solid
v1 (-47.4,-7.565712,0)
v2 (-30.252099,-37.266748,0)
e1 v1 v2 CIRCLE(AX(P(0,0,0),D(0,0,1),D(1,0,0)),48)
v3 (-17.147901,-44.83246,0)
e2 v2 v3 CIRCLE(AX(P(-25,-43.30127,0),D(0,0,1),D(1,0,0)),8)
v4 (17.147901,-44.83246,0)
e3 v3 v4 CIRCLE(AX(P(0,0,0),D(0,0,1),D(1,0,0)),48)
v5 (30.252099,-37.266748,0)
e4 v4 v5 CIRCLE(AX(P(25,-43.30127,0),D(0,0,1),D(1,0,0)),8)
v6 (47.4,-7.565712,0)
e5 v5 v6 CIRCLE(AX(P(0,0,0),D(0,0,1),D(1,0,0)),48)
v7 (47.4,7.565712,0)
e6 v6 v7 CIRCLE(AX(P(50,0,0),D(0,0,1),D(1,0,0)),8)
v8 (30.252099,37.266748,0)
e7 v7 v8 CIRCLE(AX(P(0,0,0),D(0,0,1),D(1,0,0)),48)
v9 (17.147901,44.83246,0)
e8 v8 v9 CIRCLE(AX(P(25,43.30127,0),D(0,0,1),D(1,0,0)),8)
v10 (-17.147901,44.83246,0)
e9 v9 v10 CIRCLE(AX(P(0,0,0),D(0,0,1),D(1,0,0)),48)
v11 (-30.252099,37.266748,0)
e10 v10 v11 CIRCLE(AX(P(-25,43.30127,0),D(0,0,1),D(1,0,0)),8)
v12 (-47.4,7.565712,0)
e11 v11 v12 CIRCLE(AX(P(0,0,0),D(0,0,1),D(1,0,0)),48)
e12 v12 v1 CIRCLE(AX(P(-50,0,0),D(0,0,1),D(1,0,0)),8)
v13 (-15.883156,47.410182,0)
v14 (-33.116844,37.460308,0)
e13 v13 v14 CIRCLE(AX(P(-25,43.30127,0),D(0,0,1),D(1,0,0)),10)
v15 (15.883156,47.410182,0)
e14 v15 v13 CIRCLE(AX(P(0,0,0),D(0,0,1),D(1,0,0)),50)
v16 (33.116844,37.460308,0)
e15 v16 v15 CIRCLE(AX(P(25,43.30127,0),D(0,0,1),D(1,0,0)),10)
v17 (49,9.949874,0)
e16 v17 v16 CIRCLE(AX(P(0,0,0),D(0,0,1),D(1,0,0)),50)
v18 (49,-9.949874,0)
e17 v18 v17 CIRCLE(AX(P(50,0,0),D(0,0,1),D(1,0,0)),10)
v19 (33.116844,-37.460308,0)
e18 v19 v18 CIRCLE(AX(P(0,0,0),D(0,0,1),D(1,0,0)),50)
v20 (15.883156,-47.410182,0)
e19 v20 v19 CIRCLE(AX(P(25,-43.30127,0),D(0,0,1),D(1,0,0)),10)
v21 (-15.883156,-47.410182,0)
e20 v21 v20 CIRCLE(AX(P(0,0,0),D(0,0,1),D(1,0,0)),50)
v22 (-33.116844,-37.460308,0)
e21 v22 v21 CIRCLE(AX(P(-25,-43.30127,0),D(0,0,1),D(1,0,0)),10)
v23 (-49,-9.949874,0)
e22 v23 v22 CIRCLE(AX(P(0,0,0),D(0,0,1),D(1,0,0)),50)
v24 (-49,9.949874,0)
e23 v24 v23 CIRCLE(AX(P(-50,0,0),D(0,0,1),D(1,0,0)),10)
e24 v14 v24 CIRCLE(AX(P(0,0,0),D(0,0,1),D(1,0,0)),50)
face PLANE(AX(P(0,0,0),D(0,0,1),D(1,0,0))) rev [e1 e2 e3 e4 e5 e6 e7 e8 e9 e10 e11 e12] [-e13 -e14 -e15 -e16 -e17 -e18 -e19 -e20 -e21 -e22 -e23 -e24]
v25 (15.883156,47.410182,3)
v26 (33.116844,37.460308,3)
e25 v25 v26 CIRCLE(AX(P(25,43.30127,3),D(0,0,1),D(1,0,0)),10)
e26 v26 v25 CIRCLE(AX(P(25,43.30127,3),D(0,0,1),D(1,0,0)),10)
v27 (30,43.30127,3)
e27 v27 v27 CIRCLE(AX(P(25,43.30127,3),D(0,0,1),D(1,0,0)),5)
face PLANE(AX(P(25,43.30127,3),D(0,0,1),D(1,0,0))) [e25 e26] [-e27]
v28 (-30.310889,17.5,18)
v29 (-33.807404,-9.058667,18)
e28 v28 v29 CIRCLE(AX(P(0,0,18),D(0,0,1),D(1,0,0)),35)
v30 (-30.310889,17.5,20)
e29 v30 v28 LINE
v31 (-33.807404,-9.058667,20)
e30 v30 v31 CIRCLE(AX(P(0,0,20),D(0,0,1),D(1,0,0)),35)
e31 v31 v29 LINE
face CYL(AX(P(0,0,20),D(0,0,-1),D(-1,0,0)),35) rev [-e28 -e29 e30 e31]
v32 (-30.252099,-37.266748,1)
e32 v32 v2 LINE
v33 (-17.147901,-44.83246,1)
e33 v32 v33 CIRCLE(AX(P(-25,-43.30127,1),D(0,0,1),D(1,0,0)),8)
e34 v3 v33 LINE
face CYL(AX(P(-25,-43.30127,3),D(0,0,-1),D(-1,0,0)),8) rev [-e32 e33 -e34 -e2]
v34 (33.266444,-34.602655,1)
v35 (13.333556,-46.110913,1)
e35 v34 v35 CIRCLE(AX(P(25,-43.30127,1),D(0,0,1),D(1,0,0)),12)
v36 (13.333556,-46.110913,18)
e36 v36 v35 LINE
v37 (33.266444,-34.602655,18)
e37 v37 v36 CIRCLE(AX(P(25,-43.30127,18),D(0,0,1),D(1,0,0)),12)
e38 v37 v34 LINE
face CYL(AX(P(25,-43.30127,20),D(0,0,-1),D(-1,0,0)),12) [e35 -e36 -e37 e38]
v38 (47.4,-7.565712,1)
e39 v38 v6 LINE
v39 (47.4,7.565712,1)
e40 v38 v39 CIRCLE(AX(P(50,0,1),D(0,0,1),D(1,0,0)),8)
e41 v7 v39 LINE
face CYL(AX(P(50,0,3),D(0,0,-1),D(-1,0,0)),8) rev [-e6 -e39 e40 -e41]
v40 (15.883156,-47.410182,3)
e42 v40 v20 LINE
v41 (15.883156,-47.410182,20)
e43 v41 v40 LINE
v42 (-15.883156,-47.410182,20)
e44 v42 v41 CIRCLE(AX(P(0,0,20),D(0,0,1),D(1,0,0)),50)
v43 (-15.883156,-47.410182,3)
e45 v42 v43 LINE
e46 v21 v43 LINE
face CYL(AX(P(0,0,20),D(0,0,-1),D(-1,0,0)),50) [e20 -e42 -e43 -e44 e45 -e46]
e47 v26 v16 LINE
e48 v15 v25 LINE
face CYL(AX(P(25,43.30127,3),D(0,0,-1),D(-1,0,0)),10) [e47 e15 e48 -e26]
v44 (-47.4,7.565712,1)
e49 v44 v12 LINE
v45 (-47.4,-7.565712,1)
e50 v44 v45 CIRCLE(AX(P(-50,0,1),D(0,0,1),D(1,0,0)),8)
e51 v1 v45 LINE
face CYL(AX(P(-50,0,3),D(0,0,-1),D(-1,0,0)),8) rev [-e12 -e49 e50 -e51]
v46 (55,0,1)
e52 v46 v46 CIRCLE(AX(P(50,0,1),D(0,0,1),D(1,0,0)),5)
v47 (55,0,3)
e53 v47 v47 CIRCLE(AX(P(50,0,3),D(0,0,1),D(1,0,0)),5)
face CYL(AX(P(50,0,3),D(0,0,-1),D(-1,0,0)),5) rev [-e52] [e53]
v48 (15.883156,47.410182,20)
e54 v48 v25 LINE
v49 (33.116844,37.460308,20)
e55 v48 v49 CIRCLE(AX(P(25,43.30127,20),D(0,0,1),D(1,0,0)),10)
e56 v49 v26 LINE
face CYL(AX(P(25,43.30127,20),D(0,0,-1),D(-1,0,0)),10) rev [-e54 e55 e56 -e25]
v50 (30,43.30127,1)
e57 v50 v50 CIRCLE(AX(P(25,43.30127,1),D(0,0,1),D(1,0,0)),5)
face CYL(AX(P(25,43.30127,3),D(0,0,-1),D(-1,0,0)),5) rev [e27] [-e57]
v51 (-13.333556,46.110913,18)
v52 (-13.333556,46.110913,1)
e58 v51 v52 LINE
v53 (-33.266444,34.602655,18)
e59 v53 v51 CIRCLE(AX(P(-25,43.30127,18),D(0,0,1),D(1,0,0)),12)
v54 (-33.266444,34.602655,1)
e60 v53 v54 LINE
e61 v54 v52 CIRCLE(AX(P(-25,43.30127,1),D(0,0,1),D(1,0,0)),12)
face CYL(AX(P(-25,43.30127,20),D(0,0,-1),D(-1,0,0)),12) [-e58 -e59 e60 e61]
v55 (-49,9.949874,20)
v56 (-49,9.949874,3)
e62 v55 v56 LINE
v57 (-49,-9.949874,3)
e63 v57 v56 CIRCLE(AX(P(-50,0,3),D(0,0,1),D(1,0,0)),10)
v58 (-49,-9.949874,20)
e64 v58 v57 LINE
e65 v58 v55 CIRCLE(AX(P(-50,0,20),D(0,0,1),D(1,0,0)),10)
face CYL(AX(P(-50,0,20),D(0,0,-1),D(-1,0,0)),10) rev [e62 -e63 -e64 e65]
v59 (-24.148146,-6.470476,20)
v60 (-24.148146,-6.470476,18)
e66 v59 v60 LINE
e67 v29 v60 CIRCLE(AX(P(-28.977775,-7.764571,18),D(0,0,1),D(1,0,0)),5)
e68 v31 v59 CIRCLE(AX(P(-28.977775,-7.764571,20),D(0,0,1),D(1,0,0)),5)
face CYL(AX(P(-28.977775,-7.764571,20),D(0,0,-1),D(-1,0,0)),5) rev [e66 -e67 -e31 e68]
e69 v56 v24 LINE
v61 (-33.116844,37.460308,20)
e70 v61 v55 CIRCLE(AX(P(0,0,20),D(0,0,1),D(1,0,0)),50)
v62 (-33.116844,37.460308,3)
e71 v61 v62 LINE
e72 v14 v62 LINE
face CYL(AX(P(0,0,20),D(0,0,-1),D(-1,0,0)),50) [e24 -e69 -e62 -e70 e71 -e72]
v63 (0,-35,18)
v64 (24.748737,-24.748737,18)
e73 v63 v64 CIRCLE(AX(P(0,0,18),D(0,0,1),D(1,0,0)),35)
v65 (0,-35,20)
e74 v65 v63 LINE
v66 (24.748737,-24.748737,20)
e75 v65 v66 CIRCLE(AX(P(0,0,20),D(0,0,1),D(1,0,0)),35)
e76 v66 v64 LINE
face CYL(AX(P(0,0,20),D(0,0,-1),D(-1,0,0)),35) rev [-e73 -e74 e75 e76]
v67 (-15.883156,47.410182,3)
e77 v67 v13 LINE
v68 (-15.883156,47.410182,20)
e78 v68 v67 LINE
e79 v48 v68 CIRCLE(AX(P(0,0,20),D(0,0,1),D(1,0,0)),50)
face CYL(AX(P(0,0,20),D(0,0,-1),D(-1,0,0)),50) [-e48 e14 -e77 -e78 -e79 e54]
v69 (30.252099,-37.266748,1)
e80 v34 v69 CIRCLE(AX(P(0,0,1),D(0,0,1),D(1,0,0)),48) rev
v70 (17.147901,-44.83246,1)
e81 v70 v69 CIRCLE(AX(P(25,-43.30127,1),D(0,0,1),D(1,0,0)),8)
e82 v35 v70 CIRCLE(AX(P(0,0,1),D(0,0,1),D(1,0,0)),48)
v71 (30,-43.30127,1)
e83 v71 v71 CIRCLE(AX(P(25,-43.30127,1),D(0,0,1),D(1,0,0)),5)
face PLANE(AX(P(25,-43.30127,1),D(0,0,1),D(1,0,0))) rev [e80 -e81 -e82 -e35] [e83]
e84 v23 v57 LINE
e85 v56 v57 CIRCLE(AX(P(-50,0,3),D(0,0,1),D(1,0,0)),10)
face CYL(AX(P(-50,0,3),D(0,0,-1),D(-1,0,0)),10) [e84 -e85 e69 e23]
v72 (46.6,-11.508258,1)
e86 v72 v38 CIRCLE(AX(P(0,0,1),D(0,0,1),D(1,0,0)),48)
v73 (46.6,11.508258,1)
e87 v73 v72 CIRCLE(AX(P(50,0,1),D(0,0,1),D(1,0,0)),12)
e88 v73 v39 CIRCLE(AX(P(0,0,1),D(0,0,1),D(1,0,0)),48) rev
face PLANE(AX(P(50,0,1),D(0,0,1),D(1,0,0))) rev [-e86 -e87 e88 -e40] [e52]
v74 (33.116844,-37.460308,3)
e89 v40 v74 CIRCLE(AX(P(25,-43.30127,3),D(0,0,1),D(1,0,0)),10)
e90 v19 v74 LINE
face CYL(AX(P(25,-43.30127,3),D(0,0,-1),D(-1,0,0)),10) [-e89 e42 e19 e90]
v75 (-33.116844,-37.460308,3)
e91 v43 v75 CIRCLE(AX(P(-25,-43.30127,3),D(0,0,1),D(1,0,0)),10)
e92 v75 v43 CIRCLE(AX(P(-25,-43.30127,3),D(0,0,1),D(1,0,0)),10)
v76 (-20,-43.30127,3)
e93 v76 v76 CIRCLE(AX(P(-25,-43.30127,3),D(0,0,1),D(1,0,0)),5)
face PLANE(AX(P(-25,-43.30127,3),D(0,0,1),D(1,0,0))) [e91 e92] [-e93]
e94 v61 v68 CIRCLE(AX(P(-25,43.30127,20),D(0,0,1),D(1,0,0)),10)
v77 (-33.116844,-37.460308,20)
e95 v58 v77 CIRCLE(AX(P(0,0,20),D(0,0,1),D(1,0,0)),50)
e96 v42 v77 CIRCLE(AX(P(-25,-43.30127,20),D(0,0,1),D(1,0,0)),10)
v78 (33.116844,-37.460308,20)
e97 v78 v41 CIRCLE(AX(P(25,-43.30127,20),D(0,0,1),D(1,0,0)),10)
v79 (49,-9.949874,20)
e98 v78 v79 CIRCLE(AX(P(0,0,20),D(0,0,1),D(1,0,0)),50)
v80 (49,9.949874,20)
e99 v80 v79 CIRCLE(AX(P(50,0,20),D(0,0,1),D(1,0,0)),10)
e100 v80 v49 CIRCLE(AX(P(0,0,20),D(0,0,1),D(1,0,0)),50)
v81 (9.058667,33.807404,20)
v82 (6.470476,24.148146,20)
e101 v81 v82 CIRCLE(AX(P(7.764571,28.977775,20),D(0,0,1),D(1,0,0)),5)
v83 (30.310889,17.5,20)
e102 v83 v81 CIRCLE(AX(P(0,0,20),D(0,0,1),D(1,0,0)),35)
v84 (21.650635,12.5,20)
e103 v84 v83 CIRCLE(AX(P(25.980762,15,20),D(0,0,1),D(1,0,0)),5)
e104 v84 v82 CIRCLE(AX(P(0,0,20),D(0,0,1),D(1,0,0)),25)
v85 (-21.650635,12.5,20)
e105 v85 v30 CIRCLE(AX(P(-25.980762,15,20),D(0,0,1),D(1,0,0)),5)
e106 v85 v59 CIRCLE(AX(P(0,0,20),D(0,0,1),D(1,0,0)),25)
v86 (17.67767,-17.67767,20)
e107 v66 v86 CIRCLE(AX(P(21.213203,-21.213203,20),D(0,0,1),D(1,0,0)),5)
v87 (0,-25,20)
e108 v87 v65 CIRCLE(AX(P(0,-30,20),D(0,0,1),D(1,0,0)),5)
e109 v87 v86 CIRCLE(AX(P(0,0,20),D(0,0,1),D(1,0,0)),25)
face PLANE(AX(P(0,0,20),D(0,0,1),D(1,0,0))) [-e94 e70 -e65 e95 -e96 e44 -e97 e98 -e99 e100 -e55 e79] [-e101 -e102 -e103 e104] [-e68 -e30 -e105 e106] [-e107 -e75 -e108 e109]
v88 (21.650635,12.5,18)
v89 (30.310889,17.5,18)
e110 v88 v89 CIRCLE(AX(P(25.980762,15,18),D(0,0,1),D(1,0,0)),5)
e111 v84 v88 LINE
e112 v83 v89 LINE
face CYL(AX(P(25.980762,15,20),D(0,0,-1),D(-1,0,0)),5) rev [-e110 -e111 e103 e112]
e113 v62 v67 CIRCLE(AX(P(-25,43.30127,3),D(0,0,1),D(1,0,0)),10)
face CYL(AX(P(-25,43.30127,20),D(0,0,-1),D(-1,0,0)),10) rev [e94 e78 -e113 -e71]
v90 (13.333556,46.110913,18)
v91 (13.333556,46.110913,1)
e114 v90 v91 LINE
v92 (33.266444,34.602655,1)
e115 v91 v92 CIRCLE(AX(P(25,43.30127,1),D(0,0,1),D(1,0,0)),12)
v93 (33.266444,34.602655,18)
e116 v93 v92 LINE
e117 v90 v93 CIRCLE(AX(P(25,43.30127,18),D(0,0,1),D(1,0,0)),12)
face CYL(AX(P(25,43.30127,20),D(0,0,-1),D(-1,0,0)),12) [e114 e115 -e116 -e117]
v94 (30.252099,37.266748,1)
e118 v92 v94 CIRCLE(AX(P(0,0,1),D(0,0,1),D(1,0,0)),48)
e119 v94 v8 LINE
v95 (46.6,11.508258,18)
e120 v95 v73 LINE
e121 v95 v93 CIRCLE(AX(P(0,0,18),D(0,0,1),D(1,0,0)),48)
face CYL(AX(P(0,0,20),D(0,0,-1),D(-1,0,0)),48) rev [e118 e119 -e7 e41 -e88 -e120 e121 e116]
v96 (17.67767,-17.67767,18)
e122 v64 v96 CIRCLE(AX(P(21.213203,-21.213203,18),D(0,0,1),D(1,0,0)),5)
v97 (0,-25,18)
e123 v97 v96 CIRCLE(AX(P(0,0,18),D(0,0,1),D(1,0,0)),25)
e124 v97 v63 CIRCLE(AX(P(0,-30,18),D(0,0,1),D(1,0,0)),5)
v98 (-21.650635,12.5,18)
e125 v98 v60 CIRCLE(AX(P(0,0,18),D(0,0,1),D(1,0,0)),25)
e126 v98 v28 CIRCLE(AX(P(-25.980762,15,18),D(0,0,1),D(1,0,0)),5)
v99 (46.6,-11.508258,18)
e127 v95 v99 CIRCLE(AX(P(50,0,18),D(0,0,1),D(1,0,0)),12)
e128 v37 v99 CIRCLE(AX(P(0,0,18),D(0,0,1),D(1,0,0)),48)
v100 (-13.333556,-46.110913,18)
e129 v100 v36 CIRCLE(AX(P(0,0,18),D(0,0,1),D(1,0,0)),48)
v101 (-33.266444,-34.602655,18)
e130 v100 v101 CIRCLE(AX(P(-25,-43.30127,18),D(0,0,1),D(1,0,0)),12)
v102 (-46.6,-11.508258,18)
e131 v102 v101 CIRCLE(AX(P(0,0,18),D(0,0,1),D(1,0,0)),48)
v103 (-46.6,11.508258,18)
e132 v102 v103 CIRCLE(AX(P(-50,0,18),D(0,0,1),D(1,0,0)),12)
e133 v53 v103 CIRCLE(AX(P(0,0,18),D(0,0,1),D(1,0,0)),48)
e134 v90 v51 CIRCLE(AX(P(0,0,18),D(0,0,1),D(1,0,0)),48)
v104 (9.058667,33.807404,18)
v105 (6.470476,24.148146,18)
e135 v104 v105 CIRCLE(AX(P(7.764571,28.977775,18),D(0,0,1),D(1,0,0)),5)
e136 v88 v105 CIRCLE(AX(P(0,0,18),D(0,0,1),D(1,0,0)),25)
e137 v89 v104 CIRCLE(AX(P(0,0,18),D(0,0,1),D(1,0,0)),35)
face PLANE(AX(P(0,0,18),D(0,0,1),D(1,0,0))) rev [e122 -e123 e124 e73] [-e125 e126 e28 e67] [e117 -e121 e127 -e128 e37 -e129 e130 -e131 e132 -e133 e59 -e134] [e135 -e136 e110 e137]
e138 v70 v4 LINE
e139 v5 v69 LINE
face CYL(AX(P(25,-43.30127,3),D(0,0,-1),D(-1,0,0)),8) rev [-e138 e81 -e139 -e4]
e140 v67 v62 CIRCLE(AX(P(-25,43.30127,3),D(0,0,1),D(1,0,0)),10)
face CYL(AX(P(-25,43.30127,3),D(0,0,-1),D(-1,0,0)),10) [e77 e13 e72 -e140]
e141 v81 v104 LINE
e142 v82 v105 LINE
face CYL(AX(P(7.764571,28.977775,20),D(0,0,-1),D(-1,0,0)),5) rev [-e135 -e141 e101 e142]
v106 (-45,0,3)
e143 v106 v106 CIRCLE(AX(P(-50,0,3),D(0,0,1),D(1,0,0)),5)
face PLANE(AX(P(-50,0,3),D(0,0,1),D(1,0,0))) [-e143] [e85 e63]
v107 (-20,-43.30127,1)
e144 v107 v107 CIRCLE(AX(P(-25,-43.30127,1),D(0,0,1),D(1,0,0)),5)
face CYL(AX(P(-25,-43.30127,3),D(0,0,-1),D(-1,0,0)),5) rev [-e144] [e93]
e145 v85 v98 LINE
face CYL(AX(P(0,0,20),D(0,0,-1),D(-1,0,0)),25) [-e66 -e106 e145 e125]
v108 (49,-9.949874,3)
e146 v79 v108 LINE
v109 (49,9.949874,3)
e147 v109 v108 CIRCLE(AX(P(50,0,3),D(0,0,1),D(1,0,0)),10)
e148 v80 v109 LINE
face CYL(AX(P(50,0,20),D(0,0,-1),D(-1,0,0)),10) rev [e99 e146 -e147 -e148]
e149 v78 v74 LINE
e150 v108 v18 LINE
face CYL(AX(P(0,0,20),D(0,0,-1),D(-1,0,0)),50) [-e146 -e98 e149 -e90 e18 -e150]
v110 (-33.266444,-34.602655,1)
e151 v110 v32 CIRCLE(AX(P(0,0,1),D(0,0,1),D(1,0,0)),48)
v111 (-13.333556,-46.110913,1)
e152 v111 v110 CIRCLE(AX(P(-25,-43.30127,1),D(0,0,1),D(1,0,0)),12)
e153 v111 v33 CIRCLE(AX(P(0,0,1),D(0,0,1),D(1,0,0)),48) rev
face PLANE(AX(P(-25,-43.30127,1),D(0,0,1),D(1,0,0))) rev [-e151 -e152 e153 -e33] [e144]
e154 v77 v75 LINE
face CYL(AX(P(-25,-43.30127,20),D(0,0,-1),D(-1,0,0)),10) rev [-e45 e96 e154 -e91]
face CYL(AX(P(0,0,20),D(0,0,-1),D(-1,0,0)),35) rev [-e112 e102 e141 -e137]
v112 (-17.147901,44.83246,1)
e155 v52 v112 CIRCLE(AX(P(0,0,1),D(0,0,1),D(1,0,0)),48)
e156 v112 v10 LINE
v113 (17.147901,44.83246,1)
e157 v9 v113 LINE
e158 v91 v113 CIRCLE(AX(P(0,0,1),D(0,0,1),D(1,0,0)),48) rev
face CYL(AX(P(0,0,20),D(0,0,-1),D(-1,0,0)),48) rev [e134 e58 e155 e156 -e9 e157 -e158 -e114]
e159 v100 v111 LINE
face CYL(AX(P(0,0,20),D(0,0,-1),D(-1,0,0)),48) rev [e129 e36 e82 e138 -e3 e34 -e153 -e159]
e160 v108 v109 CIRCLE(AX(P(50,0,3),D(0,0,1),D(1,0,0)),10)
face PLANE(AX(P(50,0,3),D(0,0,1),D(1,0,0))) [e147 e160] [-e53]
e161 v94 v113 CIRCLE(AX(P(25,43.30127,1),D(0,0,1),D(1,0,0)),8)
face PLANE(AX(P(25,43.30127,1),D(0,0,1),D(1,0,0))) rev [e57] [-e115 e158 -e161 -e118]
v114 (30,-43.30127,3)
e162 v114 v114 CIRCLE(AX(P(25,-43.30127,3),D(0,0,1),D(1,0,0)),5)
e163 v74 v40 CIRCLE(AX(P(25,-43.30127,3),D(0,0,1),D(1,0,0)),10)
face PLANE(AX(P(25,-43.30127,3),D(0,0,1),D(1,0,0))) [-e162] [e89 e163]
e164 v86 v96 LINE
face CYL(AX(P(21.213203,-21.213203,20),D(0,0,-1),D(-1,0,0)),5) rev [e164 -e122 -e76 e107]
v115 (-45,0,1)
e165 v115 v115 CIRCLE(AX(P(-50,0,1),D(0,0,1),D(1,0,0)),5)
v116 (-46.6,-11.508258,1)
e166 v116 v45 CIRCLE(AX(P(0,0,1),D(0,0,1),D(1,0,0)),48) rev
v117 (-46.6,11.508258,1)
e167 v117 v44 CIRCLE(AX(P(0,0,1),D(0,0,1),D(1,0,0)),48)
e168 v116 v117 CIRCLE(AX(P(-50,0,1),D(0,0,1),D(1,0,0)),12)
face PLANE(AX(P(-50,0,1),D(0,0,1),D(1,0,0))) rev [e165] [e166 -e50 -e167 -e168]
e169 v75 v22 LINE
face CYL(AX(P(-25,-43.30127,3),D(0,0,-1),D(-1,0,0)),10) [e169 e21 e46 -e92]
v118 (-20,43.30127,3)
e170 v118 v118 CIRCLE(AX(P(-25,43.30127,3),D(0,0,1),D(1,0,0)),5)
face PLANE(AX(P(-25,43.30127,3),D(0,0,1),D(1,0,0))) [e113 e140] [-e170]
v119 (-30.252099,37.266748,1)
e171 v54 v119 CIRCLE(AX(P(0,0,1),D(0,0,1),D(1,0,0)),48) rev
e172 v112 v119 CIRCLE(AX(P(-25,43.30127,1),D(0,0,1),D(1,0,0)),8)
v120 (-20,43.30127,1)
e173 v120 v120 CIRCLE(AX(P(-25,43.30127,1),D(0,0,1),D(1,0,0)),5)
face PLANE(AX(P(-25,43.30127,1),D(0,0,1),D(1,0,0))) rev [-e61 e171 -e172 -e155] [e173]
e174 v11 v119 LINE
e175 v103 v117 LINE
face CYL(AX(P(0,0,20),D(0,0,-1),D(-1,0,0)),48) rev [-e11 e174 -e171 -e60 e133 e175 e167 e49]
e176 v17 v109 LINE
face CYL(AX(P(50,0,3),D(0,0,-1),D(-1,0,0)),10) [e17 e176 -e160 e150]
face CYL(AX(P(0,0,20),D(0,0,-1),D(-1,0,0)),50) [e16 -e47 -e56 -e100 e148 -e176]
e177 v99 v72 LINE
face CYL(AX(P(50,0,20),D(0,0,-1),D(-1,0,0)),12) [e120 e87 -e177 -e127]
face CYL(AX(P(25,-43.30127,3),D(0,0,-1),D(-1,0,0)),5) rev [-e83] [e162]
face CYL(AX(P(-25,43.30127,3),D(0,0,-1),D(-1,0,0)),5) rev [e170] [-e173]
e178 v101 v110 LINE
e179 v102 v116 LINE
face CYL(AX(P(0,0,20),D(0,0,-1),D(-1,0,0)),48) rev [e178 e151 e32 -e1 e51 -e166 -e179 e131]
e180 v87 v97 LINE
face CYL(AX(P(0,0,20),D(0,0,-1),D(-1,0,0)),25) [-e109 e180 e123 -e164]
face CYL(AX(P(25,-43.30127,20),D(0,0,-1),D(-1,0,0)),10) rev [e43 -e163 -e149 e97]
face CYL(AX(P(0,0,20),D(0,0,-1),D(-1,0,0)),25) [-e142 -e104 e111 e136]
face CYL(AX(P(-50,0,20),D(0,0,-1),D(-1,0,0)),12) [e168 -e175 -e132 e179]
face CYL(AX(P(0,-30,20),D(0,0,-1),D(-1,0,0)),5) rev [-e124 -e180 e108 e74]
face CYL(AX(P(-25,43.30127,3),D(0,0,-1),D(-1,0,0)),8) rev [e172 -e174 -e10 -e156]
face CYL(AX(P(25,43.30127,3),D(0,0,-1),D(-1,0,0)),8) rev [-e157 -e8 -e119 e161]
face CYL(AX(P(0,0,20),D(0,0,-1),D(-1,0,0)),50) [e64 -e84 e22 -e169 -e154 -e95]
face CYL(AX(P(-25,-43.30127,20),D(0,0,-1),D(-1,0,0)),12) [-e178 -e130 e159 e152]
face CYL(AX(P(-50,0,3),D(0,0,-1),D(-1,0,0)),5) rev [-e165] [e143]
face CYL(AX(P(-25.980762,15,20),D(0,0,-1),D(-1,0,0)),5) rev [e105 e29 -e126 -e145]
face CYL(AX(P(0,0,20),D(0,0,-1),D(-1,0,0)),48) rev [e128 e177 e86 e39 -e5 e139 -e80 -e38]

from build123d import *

# Parameters (mm, degrees)
BOSS_EXTRUDE2_DEPTH = 20
SKETCH1_3_R         = 10
SKETCH1_3_R_2       = 5
BOSS_EXTRUDE3_DEPTH = 3
SHELL1_DEPTH        = 18
SHELL1_2_OUTLINE_R  = 5
SHELL1_2_DEPTH      = 1


# Read off the part's stored shape, not the designer's step: Shell1
with BuildPart() as part:
    # Sketch1 → Boss-Extrude2 (new body)
    with BuildSketch(Plane.XY):
        with BuildLine():
            ThreePointArc((-40, 0), (-42.583801513, -6.708203932), (-49, -9.949874371))
            ThreePointArc((-49, -9.949874371), (-43.301270189, -25), (-33.11684397, -37.4603076))
            ThreePointArc((-33.11684397, -37.4603076), (-21.931485677, -33.783695926), (-15, -43.301270189))
            ThreePointArc((-15, -43.301270189), (-15.223281744, -45.402645965), (-15.88315603, -47.410181971))
            ThreePointArc((-15.88315603, -47.410181971), (0, -50), (15.88315603, -47.410181971))
            ThreePointArc((15.88315603, -47.410181971), (20, -34.641016151), (33.11684397, -37.4603076))
            ThreePointArc((33.11684397, -37.4603076), (43.301270189, -25), (49, -9.949874371))
            ThreePointArc((49, -9.949874371), (40, 0), (49, 9.949874371))
            ThreePointArc((49, 9.949874371), (43.301270189, 25), (33.11684397, 37.4603076))
            ThreePointArc((33.11684397, 37.4603076), (20, 34.641016151), (15.88315603, 47.410181971))
            ThreePointArc((15.88315603, 47.410181971), (0, 50), (-15.88315603, 47.410181971))
            ThreePointArc((-15.88315603, 47.410181971), (-15.223281744, 45.402645965), (-15, 43.301270189))
            ThreePointArc((-15, 43.301270189), (-21.931485677, 33.783695926), (-33.11684397, 37.4603076))
            ThreePointArc((-33.11684397, 37.4603076), (-43.301270189, 25), (-49, 9.949874371))
            ThreePointArc((-49, 9.949874371), (-42.583801513, 6.708203932), (-40, 0))
        make_face()
        with BuildLine():
            ThreePointArc((24.748737342, -24.748737342), (13.393920133, -32.335783638), (0, -35))
            ThreePointArc((0, -35), (-5, -30), (0, -25))
            ThreePointArc((0, -25), (9.567085809, -23.096988313), (17.67766953, -17.67766953))
            ThreePointArc((17.67766953, -17.67766953), (24.748737342, -17.67766953), (24.748737342, -24.748737342))
        make_face(mode=Mode.SUBTRACT)
        with BuildLine():
            ThreePointArc((-33.80740392, -9.058666579), (-34.700570148, 4.568416728), (-30.310889132, 17.5))
            ThreePointArc((-30.310889132, 17.5), (-23.480762114, 19.330127019), (-21.650635095, 12.5))
            ThreePointArc((-21.650635095, 12.5), (-24.786121534, 3.263154806), (-24.148145657, -6.470476128))
            ThreePointArc((-24.148145657, -6.470476128), (-27.683679563, -12.594200485), (-33.80740392, -9.058666579))
        make_face(mode=Mode.SUBTRACT)
        with BuildLine():
            ThreePointArc((9.058666579, 33.80740392), (21.306650015, 27.76736691), (30.310889132, 17.5))
            ThreePointArc((30.310889132, 17.5), (28.480762114, 10.669872981), (21.650635095, 12.5))
            ThreePointArc((21.650635095, 12.5), (15.219035725, 19.833833507), (6.470476128, 24.148145657))
            ThreePointArc((6.470476128, 24.148145657), (2.934942222, 30.271870014), (9.058666579, 33.80740392))
        make_face(mode=Mode.SUBTRACT)
    extrude(amount=BOSS_EXTRUDE2_DEPTH)

    # Sketch1<3> → Boss-Extrude3 (add)
    # profile 1 of 6: a face of its own
    with BuildSketch(Plane.XY):
        with Locations((50, 0)):
            Circle(SKETCH1_3_R)
        with Locations((50, 0)):
            Circle(SKETCH1_3_R_2, mode=Mode.SUBTRACT)
    # profile 2 of 6: a face of its own
    with BuildSketch(Plane.XY):
        with Locations((25, -43.301270189)):
            Circle(SKETCH1_3_R)
        with Locations((25, -43.301270189)):
            Circle(SKETCH1_3_R_2, mode=Mode.SUBTRACT)
    # profile 3 of 6: a face of its own
    with BuildSketch(Plane.XY):
        with Locations((-25, -43.301270189)):
            Circle(SKETCH1_3_R)
        with Locations((-25, -43.301270189)):
            Circle(SKETCH1_3_R_2, mode=Mode.SUBTRACT)
    # profile 4 of 6: a face of its own
    with BuildSketch(Plane.XY):
        with Locations((-50, 0)):
            Circle(SKETCH1_3_R)
        with Locations((-50, 0)):
            Circle(SKETCH1_3_R_2, mode=Mode.SUBTRACT)
    # profile 5 of 6: a face of its own
    with BuildSketch(Plane.XY):
        with Locations((-25, 43.301270189)):
            Circle(SKETCH1_3_R)
        with Locations((-25, 43.301270189)):
            Circle(SKETCH1_3_R_2, mode=Mode.SUBTRACT)
    # profile 6 of 6: a face of its own
    with BuildSketch(Plane.XY):
        with Locations((25, 43.301270189)):
            Circle(SKETCH1_3_R)
        with Locations((25, 43.301270189)):
            Circle(SKETCH1_3_R_2, mode=Mode.SUBTRACT)
    extrude(amount=BOSS_EXTRUDE3_DEPTH)

    # Shell1 outline → Shell1 (cut)
    with BuildSketch(Plane.XY):
        with BuildLine():
            ThreePointArc((46.6, 11.508257905), (41.569219382, 24), (33.266443699, 34.602654864))
            ThreePointArc((33.266443699, 34.602654864), (19, 32.908965344), (13.333556301, 46.110912769))
            ThreePointArc((13.333556301, 46.110912769), (0, 48), (-13.333556301, 46.110912769))
            ThreePointArc((-13.333556301, 46.110912769), (-19, 32.908965344), (-33.266443699, 34.602654864))
            ThreePointArc((-33.266443699, 34.602654864), (-41.569219382, 24), (-46.6, 11.508257905))
            ThreePointArc((-46.6, 11.508257905), (-38, 0), (-46.6, -11.508257905))
            ThreePointArc((-46.6, -11.508257905), (-41.569219382, -24), (-33.266443699, -34.602654864))
            ThreePointArc((-33.266443699, -34.602654864), (-19, -32.908965344), (-13.333556301, -46.110912769))
            ThreePointArc((-13.333556301, -46.110912769), (0, -48), (13.333556301, -46.110912769))
            ThreePointArc((13.333556301, -46.110912769), (19, -32.908965344), (33.266443699, -34.602654864))
            ThreePointArc((33.266443699, -34.602654864), (41.569219382, -24), (46.6, -11.508257905))
            ThreePointArc((46.6, -11.508257905), (38, 0), (46.6, 11.508257905))
        make_face()
        with BuildLine():
            ThreePointArc((17.67766953, -17.67766953), (24.748737342, -17.67766953), (24.748737342, -24.748737342))
            ThreePointArc((24.748737342, -24.748737342), (13.393920133, -32.335783638), (0, -35))
            ThreePointArc((0, -35), (-5, -30), (0, -25))
            ThreePointArc((0, -25), (9.567085809, -23.096988313), (17.67766953, -17.67766953))
        make_face(mode=Mode.SUBTRACT)
        with BuildLine():
            ThreePointArc((-21.650635095, 12.5), (-24.786121534, 3.263154805), (-24.148145657, -6.470476128))
            ThreePointArc((-24.148145657, -6.470476128), (-27.683679563, -12.594200485), (-33.80740392, -9.058666579))
            ThreePointArc((-33.80740392, -9.058666579), (-34.700570148, 4.568416728), (-30.310889132, 17.5))
            ThreePointArc((-30.310889132, 17.5), (-23.480762113, 19.330127019), (-21.650635095, 12.5))
        make_face(mode=Mode.SUBTRACT)
        with BuildLine():
            ThreePointArc((6.470476128, 24.148145657), (2.934942222, 30.271870014), (9.058666579, 33.80740392))
            ThreePointArc((9.058666579, 33.80740392), (21.306650015, 27.76736691), (30.310889132, 17.5))
            ThreePointArc((30.310889132, 17.5), (28.480762114, 10.669872981), (21.650635095, 12.5))
            ThreePointArc((21.650635095, 12.5), (15.219035725, 19.833833507), (6.470476128, 24.148145657))
        make_face(mode=Mode.SUBTRACT)
    extrude(amount=SHELL1_DEPTH, mode=Mode.SUBTRACT)

    # Shell1 2 outline → Shell1 2 (cut)
    # profile 1 of 6: a face of its own
    with BuildSketch(Plane.XY):
        with BuildLine():
            ThreePointArc((13.333556301, 46.110912769), (19, 32.908965344), (33.266443699, 34.602654864))
            ThreePointArc((33.266443699, 34.602654864), (31.787193359, 35.966294477), (30.2520989, 37.266748076))
            ThreePointArc((30.2520989, 37.266748076), (29, 50.229473419), (17.1479011, 44.832460203))
            ThreePointArc((17.1479011, 44.832460203), (15.254128017, 45.511664202), (13.333556301, 46.110912769))
        make_face()
        with Locations((25, 43.301270189)):
            Circle(SHELL1_2_OUTLINE_R, mode=Mode.SUBTRACT)
    # profile 2 of 6: a face of its own
    with BuildSketch(Plane.XY):
        with BuildLine():
            ThreePointArc((47.4, 7.565712128), (47.041321376, 9.545369726), (46.6, 11.508257905))
            ThreePointArc((46.6, 11.508257905), (38, 0), (46.6, -11.508257905))
            ThreePointArc((46.6, -11.508257905), (47.041321376, -9.545369726), (47.4, -7.565712128))
            ThreePointArc((47.4, -7.565712128), (58, 0), (47.4, 7.565712128))
        make_face()
        with Locations((50, 0)):
            Circle(SHELL1_2_OUTLINE_R, mode=Mode.SUBTRACT)
    # profile 3 of 6: a face of its own
    with BuildSketch(Plane.XY):
        with BuildLine():
            ThreePointArc((-33.266443699, 34.602654864), (-19, 32.908965344), (-13.333556301, 46.110912769))
            ThreePointArc((-13.333556301, 46.110912769), (-15.254128017, 45.511664202), (-17.1479011, 44.832460203))
            ThreePointArc((-17.1479011, 44.832460203), (-29, 50.229473419), (-30.2520989, 37.266748076))
            ThreePointArc((-30.2520989, 37.266748076), (-31.787193359, 35.966294477), (-33.266443699, 34.602654864))
        make_face()
        with Locations((-25, 43.301270189)):
            Circle(SHELL1_2_OUTLINE_R, mode=Mode.SUBTRACT)
    # profile 4 of 6: a face of its own
    with BuildSketch(Plane.XY):
        with BuildLine():
            ThreePointArc((30.2520989, -37.266748076), (31.787193359, -35.966294477), (33.266443699, -34.602654864))
            ThreePointArc((33.266443699, -34.602654864), (19, -32.908965344), (13.333556301, -46.110912769))
            ThreePointArc((13.333556301, -46.110912769), (15.254128017, -45.511664202), (17.1479011, -44.832460203))
            ThreePointArc((17.1479011, -44.832460203), (29, -50.229473419), (30.2520989, -37.266748076))
        make_face()
        with Locations((25, -43.301270189)):
            Circle(SHELL1_2_OUTLINE_R, mode=Mode.SUBTRACT)
    # profile 5 of 6: a face of its own
    with BuildSketch(Plane.XY):
        with BuildLine():
            ThreePointArc((-46.6, -11.508257905), (-38, 0), (-46.6, 11.508257905))
            ThreePointArc((-46.6, 11.508257905), (-47.041321376, 9.545369726), (-47.4, 7.565712128))
            ThreePointArc((-47.4, 7.565712128), (-58, 0), (-47.4, -7.565712128))
            ThreePointArc((-47.4, -7.565712128), (-47.041321376, -9.545369726), (-46.6, -11.508257905))
        make_face()
        with Locations((-50, 0)):
            Circle(SHELL1_2_OUTLINE_R, mode=Mode.SUBTRACT)
    # profile 6 of 6: a face of its own
    with BuildSketch(Plane.XY):
        with BuildLine():
            ThreePointArc((-17.1479011, -44.832460203), (-15.254128017, -45.511664202), (-13.333556301, -46.110912769))
            ThreePointArc((-13.333556301, -46.110912769), (-19, -32.908965344), (-33.266443699, -34.602654864))
            ThreePointArc((-33.266443699, -34.602654864), (-31.787193359, -35.966294477), (-30.2520989, -37.266748076))
            ThreePointArc((-30.2520989, -37.266748076), (-29, -50.229473419), (-17.1479011, -44.832460203))
        make_face()
        with Locations((-25, -43.301270189)):
            Circle(SHELL1_2_OUTLINE_R, mode=Mode.SUBTRACT)
    extrude(amount=SHELL1_2_DEPTH, mode=Mode.SUBTRACT)


solid = part.part
